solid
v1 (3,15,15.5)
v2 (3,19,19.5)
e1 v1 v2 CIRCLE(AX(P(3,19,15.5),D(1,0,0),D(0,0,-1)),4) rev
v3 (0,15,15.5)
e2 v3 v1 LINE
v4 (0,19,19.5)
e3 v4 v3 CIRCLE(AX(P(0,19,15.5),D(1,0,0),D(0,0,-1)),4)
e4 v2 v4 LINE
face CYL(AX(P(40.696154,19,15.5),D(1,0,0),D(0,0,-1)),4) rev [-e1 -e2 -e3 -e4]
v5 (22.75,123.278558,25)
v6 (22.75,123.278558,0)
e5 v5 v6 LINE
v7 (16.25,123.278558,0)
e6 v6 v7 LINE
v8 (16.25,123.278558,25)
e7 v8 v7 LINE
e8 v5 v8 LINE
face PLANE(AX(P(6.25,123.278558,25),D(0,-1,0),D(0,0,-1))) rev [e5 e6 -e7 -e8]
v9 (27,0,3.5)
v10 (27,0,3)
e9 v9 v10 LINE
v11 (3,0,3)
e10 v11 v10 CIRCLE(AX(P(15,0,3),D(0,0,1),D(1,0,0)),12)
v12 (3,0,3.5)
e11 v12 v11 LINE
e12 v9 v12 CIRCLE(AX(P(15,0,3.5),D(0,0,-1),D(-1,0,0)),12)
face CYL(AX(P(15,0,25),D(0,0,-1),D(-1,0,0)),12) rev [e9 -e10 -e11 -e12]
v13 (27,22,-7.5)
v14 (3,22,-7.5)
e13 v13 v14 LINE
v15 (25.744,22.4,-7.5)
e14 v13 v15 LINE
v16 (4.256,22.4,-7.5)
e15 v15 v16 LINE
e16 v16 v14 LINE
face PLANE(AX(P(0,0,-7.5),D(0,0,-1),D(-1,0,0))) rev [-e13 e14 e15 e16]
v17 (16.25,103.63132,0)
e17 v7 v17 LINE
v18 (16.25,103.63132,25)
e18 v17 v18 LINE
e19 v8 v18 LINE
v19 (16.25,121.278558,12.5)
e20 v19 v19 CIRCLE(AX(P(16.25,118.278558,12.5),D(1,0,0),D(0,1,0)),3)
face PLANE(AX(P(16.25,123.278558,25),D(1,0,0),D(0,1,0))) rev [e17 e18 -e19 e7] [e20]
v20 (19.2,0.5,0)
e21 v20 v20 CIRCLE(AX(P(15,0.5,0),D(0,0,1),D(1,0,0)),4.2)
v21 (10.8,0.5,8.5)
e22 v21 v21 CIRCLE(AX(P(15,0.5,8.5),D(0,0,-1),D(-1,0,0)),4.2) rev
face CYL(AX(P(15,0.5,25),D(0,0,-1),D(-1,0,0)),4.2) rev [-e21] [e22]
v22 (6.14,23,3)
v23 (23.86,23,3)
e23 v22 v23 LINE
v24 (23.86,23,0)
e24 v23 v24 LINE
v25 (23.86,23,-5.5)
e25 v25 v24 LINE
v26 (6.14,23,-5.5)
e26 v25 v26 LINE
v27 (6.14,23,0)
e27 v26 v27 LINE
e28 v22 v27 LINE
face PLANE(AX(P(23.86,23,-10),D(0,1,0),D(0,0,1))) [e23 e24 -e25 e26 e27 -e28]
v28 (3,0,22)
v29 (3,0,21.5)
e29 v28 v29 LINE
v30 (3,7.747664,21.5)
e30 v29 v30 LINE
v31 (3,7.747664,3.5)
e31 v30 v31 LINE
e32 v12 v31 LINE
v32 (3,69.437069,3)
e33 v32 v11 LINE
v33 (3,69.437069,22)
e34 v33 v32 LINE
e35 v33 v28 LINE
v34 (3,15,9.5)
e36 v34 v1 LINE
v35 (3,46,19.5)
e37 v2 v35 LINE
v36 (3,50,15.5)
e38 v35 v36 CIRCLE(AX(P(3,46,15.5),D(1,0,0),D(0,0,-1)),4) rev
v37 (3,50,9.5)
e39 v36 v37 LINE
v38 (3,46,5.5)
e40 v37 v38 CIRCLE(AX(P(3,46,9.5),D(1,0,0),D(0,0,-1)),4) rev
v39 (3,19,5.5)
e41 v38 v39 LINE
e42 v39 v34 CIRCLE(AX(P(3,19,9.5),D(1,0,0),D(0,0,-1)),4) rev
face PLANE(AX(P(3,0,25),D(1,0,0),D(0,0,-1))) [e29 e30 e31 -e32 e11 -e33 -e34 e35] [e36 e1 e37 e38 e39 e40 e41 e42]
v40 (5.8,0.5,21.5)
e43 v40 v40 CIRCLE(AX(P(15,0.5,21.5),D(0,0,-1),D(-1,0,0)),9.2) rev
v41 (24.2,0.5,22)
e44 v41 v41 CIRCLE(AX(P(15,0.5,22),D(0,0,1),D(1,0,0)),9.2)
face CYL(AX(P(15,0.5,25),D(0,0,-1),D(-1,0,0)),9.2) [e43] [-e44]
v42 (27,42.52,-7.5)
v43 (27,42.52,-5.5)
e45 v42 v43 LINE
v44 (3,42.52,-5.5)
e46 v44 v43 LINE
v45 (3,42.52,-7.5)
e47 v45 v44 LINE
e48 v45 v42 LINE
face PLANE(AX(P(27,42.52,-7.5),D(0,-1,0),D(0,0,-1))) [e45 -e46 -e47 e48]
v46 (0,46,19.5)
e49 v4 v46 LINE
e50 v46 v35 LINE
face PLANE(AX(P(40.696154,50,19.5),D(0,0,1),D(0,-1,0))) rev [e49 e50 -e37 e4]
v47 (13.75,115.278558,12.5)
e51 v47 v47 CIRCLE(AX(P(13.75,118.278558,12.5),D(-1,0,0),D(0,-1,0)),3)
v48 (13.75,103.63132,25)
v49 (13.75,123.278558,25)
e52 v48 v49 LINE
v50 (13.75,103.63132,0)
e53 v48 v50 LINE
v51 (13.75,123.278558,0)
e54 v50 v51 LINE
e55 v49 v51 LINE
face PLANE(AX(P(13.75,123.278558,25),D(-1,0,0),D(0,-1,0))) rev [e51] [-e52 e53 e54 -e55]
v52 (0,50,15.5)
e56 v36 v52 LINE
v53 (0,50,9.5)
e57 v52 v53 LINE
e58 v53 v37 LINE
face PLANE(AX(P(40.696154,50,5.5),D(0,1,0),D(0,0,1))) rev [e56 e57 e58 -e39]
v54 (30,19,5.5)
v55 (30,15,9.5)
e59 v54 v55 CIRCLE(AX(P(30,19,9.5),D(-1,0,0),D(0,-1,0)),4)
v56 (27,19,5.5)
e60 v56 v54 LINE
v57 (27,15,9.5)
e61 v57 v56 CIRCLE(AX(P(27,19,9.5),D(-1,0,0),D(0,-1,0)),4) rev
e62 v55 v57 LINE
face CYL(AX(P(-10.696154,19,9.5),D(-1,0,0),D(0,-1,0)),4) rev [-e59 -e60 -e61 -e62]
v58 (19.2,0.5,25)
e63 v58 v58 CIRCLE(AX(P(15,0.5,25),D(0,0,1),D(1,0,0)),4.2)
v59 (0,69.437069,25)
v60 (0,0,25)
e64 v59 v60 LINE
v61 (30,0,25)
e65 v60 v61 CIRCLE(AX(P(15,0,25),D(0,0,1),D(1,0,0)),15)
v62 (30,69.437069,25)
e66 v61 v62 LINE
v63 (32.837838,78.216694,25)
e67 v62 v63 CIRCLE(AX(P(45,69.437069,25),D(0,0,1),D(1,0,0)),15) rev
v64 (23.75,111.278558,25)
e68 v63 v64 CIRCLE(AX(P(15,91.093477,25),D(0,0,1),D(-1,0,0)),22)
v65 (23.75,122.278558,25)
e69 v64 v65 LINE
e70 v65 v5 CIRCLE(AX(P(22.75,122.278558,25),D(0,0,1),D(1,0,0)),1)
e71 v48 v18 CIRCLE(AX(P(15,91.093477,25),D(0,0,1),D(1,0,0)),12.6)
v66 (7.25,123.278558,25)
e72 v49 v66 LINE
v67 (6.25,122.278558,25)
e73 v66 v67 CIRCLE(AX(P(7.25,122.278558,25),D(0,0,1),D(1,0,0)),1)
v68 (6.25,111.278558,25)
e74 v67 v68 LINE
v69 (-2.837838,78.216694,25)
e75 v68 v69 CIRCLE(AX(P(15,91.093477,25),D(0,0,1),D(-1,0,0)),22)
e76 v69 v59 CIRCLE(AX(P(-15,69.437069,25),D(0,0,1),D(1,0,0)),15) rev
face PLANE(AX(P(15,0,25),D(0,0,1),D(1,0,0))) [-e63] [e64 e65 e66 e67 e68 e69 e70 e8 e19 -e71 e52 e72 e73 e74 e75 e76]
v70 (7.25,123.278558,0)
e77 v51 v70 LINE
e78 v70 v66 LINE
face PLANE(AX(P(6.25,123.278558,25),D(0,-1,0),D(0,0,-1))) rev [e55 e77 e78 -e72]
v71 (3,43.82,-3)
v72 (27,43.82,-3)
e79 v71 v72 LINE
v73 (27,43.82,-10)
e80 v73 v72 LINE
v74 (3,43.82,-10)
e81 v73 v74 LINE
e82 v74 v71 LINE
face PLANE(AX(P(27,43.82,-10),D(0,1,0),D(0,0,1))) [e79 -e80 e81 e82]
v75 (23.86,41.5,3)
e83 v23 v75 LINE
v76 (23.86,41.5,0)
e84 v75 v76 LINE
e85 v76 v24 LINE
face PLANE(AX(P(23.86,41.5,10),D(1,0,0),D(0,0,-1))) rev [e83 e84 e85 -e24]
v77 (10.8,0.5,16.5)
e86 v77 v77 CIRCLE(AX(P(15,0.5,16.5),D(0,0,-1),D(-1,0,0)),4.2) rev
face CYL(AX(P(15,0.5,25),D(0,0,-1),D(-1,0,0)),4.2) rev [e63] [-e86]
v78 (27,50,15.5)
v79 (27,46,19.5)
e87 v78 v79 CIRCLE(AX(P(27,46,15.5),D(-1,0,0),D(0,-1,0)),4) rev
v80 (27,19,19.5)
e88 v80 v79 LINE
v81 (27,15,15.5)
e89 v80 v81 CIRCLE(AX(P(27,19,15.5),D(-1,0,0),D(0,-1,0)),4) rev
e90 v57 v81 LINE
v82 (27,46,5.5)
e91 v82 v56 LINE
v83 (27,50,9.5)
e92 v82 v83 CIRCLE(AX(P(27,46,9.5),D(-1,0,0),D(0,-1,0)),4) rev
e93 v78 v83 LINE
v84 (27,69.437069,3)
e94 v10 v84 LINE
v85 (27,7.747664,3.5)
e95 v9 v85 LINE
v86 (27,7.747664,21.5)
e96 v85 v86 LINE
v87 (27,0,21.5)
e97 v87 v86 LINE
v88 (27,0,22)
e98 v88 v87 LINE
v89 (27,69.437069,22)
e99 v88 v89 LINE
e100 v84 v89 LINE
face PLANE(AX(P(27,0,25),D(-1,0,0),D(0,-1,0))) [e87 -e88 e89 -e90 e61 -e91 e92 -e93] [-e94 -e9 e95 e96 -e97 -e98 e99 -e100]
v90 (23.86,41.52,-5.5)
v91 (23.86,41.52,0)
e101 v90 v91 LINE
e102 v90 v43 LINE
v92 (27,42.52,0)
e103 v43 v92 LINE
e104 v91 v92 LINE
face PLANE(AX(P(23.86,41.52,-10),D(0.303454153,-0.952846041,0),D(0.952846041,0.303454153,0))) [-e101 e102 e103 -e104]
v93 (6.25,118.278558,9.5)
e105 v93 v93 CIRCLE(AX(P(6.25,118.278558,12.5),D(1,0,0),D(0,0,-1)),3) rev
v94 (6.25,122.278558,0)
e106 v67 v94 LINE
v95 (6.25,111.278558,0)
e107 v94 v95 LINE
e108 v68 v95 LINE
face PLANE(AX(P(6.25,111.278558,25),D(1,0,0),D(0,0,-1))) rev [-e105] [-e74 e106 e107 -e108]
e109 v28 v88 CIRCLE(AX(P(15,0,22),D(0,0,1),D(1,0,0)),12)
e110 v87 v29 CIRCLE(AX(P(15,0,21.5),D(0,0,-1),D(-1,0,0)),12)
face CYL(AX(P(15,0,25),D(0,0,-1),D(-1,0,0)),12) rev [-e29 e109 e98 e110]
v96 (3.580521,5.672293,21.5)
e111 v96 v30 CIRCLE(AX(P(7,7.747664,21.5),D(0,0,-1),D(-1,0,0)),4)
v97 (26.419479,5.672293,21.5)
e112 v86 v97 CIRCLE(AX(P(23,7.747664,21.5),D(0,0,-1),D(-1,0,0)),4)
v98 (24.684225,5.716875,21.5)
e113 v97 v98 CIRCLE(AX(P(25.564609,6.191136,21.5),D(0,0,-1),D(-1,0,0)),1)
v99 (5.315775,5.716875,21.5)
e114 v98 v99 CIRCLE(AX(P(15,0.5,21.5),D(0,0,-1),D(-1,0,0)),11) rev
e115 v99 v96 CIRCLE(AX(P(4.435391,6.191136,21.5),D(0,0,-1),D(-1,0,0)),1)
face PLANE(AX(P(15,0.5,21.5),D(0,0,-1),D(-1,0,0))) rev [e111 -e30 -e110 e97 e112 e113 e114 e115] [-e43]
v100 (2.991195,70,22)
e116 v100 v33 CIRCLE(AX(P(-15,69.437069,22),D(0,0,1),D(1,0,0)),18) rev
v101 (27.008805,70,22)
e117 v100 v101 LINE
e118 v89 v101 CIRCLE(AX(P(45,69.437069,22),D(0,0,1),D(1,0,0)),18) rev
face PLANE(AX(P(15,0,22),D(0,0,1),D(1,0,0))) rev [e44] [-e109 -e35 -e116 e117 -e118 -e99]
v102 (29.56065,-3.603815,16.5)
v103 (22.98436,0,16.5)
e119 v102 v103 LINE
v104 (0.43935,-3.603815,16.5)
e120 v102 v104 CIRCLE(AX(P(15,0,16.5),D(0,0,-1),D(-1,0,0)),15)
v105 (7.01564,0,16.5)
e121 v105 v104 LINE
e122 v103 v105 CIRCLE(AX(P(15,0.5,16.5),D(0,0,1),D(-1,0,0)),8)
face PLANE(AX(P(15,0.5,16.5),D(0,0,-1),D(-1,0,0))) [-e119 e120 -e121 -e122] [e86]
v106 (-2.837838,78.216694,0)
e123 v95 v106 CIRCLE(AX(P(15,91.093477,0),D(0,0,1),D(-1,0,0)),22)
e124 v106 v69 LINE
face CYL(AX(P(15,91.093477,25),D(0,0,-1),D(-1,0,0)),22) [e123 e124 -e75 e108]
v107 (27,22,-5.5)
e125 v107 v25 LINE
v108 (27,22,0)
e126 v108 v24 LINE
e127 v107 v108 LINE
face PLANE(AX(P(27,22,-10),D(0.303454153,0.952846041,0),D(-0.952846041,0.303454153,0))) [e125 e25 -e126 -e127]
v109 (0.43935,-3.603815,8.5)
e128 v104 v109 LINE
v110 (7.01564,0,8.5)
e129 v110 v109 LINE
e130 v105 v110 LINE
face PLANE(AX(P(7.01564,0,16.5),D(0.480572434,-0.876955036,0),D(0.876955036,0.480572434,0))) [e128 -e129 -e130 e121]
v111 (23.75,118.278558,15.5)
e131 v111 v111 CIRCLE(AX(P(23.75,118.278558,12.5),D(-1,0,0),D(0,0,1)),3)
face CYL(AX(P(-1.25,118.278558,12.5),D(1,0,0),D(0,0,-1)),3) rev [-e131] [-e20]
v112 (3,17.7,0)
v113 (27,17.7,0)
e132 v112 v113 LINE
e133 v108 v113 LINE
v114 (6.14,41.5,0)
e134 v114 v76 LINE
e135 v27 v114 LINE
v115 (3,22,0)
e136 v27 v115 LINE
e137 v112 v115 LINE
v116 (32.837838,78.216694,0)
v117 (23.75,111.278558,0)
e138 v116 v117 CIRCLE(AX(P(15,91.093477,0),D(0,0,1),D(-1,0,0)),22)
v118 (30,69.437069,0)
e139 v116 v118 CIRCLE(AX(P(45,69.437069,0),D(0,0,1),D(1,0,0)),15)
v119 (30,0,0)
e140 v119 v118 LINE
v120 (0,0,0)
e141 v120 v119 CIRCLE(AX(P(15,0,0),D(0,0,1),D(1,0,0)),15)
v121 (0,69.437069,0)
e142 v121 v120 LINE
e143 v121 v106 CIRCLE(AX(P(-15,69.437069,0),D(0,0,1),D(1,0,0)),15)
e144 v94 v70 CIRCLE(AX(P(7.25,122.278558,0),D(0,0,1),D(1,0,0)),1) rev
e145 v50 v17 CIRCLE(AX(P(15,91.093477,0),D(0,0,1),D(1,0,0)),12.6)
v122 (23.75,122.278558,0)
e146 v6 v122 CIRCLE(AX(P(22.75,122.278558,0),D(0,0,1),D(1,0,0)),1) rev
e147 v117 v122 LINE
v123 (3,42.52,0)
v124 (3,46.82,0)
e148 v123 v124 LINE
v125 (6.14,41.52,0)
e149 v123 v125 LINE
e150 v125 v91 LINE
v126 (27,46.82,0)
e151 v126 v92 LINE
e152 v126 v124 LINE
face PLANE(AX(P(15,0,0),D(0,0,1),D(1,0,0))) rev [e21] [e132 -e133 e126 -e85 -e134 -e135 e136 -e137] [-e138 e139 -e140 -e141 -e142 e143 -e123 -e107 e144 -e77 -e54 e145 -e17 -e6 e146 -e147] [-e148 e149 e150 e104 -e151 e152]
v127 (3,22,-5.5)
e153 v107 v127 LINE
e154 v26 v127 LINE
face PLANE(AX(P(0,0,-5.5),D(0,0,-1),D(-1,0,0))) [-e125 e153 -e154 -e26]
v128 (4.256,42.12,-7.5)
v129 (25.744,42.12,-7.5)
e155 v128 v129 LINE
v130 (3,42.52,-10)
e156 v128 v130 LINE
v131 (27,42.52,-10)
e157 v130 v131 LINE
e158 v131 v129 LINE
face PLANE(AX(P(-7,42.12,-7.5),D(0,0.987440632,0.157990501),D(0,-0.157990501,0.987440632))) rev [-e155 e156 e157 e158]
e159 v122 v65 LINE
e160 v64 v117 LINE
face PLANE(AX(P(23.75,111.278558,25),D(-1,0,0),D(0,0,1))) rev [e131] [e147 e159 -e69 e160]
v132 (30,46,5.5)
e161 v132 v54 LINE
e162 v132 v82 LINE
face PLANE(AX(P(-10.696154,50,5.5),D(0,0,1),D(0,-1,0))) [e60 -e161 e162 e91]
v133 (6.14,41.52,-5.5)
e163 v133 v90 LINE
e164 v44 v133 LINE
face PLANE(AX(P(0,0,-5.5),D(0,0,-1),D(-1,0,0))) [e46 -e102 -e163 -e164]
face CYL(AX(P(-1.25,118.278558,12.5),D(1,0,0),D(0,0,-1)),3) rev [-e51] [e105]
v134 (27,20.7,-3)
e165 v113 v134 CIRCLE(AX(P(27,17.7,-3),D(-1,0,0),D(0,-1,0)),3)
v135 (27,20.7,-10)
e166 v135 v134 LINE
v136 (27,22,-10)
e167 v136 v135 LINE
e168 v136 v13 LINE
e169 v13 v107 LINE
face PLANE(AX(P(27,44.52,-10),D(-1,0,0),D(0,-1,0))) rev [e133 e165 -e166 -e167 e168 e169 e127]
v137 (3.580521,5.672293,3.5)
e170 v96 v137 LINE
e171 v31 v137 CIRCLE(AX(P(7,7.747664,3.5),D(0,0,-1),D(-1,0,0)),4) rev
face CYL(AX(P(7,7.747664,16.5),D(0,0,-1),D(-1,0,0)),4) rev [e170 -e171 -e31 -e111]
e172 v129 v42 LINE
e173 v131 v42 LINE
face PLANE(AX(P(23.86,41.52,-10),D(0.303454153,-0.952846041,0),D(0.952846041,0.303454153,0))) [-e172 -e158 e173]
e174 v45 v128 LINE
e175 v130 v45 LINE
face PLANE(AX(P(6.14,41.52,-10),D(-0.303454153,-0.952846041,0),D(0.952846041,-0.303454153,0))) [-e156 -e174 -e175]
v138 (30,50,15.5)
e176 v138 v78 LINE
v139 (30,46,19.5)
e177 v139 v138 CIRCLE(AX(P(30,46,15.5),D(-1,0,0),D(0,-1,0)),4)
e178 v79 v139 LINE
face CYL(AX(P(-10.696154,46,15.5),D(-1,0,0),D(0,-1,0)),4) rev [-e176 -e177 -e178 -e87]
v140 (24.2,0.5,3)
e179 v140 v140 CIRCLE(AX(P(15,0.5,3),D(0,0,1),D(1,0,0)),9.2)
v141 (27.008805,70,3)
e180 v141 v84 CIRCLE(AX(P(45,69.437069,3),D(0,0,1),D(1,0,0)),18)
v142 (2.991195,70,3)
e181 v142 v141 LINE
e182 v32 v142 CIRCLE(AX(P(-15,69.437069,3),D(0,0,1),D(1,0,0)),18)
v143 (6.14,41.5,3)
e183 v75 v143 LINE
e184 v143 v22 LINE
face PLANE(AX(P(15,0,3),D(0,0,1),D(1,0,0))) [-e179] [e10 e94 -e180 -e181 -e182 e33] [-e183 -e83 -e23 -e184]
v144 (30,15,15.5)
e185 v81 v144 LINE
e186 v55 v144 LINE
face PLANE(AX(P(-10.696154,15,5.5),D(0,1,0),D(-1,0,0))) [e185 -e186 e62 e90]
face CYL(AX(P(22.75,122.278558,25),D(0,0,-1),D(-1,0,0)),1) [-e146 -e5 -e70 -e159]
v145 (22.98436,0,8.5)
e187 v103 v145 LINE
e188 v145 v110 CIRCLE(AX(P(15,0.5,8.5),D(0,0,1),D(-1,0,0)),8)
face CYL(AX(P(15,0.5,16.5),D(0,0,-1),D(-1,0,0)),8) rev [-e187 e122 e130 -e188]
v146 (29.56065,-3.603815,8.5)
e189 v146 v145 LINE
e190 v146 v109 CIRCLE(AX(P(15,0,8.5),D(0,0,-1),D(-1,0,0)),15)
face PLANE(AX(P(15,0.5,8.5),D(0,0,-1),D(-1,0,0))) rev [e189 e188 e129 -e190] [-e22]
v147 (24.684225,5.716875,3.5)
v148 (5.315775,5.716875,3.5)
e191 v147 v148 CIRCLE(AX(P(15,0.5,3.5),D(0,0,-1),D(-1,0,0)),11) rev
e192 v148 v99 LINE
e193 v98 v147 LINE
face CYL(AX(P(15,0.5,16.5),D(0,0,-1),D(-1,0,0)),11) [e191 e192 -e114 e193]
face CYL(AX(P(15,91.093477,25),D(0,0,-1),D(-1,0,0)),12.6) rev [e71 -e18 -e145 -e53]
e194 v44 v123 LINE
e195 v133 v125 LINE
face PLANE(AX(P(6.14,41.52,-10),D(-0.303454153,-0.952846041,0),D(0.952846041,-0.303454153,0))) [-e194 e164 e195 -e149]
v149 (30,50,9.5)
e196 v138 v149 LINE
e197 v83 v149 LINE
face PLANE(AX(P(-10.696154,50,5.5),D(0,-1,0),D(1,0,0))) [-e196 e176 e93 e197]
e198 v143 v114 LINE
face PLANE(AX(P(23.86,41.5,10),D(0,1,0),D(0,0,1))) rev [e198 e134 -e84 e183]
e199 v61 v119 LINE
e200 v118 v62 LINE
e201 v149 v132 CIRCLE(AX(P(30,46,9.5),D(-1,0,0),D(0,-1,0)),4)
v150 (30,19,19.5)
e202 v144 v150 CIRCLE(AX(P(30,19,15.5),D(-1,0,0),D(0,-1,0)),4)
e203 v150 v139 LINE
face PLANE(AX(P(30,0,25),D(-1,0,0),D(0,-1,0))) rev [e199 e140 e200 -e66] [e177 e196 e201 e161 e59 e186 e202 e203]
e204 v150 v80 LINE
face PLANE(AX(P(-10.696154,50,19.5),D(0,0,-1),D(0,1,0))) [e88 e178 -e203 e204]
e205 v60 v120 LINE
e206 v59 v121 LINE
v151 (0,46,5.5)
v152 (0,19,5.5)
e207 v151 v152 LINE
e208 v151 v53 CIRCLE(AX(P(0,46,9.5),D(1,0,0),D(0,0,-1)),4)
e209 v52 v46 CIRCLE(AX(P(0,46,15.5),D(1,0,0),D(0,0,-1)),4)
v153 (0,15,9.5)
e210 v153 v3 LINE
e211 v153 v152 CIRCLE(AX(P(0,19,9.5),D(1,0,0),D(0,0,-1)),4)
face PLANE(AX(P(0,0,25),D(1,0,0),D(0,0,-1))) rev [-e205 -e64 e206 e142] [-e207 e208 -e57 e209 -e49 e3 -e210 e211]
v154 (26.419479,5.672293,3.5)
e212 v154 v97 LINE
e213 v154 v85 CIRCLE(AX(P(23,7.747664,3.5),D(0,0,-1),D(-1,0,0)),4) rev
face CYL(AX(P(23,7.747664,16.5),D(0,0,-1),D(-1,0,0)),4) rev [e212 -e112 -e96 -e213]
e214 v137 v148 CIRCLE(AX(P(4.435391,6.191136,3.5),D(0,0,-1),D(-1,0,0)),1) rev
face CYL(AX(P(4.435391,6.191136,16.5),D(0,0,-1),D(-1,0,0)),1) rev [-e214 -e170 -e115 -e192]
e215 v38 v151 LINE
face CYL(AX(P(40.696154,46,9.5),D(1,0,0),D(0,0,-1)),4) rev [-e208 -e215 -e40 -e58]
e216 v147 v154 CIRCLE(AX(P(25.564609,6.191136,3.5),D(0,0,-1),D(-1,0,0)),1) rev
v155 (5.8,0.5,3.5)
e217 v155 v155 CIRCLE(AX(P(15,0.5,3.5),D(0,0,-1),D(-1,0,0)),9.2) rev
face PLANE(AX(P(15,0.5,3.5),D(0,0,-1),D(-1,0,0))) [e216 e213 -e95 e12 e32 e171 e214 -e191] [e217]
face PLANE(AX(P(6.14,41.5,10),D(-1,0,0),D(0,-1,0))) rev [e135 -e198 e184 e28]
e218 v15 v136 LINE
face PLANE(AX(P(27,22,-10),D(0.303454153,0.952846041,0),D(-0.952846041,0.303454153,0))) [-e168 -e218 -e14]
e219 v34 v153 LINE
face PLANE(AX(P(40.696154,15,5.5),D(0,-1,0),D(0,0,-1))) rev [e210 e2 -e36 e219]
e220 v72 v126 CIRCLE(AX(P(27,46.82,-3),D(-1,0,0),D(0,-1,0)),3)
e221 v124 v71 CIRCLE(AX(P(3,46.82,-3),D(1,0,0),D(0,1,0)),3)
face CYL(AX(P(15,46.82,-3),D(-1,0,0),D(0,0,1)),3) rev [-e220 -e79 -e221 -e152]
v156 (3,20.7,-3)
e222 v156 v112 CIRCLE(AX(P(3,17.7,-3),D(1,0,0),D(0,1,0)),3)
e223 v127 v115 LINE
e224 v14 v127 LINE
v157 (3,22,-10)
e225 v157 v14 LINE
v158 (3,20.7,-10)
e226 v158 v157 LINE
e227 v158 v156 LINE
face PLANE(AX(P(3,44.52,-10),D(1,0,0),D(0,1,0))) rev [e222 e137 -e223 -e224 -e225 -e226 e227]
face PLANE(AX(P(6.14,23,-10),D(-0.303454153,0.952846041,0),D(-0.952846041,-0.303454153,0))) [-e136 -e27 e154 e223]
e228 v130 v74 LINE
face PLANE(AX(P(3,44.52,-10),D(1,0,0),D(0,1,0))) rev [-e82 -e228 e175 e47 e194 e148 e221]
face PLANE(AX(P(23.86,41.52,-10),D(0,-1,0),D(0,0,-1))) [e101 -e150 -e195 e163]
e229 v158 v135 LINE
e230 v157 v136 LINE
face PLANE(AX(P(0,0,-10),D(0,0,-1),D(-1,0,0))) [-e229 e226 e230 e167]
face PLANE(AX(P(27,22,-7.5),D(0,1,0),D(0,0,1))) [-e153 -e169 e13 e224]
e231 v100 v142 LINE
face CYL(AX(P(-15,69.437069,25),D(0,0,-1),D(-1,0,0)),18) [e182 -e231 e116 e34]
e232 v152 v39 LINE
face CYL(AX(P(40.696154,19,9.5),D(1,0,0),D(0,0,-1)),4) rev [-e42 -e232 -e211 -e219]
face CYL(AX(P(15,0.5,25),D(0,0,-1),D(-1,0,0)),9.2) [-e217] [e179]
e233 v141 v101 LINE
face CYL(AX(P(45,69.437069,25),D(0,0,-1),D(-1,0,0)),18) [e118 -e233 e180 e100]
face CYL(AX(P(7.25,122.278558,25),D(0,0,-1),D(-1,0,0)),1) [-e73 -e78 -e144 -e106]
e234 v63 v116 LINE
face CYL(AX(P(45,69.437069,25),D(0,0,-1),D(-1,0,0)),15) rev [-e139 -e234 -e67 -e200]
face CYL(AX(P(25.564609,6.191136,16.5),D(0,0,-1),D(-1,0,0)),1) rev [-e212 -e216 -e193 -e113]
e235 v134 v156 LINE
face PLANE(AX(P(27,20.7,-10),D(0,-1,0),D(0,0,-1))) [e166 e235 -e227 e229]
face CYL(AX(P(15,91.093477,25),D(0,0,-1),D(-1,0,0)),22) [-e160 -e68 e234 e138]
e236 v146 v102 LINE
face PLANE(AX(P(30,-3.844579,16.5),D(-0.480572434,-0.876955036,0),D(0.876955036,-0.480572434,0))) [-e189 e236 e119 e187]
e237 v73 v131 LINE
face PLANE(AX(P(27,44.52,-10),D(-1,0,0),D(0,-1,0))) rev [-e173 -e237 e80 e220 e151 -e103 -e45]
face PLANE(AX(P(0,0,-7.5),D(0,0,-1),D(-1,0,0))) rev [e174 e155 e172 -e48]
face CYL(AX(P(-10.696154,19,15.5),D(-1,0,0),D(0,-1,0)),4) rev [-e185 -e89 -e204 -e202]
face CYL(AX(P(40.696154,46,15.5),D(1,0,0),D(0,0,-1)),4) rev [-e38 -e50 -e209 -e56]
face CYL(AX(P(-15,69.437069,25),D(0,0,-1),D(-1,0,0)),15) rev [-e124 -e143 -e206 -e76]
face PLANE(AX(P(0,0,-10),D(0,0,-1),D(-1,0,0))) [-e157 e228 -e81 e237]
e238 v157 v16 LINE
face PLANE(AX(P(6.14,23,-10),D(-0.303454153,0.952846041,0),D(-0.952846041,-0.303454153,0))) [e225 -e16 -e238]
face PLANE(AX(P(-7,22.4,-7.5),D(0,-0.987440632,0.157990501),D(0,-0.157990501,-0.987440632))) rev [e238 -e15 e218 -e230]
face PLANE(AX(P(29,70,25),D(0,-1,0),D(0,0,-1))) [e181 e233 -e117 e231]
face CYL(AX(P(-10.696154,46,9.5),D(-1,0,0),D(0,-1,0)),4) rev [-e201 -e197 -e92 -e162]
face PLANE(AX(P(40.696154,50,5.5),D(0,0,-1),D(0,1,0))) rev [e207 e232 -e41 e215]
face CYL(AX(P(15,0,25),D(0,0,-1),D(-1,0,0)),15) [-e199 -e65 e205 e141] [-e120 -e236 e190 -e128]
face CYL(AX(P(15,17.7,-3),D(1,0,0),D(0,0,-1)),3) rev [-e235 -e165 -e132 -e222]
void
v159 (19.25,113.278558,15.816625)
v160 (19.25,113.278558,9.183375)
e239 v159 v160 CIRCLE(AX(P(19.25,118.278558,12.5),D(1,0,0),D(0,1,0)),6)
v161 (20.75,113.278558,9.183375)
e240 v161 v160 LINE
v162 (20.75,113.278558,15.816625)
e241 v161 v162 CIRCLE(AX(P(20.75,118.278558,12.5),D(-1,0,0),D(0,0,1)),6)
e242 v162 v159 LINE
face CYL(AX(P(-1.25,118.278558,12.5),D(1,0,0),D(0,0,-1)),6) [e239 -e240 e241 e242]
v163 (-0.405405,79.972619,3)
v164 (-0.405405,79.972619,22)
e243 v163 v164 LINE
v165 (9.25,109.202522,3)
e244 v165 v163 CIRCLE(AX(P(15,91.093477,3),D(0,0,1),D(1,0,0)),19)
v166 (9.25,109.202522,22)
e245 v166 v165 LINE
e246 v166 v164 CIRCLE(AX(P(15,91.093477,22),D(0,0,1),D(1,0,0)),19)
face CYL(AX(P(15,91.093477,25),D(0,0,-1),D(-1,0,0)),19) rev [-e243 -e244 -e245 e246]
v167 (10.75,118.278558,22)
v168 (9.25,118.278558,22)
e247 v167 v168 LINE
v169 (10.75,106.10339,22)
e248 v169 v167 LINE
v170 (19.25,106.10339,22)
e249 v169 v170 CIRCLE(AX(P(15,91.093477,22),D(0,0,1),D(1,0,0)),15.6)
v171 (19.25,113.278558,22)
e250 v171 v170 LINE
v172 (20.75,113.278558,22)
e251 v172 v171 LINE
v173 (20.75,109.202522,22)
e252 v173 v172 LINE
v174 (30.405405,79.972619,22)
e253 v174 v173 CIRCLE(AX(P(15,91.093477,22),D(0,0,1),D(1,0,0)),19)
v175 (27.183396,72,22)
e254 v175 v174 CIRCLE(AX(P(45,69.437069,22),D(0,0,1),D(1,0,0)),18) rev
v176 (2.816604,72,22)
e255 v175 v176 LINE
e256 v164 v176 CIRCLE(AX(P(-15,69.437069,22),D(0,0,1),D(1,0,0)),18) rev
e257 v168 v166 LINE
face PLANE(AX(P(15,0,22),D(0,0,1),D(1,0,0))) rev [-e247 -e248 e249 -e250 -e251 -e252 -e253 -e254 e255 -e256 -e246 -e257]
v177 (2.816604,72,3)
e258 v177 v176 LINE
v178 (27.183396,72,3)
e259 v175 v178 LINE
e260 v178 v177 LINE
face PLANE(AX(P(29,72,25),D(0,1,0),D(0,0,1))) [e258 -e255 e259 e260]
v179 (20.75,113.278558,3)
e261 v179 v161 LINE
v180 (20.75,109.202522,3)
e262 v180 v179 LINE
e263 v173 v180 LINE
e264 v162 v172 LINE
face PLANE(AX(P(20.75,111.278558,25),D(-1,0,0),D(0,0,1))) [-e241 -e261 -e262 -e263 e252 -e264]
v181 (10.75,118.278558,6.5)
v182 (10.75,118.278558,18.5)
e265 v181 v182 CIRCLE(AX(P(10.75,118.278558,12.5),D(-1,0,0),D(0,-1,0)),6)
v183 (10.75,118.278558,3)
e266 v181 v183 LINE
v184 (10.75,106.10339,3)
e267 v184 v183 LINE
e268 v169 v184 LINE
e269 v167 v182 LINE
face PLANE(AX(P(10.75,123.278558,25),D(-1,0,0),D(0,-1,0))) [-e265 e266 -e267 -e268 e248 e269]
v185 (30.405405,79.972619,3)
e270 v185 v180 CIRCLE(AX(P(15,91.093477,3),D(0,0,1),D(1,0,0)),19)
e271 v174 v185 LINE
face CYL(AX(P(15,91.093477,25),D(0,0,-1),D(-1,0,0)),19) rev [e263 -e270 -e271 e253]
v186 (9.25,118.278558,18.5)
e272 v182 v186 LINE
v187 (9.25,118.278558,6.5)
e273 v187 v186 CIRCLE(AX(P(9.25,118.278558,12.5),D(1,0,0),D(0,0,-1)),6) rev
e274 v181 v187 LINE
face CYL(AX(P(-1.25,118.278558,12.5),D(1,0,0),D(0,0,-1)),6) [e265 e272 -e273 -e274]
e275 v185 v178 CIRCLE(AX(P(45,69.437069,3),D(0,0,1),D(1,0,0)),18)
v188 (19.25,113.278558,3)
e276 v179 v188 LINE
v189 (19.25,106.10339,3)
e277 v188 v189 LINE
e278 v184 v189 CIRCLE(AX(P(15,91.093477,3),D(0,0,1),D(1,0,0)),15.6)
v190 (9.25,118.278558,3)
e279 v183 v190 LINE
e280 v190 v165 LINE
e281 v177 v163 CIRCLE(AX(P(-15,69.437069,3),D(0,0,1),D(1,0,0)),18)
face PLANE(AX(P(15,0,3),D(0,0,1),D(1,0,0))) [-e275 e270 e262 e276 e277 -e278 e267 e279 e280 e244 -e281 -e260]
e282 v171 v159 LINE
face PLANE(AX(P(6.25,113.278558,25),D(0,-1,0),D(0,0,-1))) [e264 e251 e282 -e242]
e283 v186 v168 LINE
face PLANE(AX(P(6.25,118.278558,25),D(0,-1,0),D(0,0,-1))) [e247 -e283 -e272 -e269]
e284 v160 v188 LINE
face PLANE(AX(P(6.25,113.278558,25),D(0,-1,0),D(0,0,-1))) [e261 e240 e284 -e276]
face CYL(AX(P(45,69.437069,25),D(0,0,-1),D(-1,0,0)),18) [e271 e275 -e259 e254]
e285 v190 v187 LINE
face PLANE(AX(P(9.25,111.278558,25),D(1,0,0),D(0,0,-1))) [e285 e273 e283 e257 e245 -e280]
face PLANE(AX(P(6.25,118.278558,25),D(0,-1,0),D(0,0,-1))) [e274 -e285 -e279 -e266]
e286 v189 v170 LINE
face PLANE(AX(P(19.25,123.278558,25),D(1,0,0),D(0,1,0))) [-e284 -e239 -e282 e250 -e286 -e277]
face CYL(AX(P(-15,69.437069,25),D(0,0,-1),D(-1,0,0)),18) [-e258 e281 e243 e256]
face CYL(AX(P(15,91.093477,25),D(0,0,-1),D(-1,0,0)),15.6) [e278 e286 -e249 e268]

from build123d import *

# Parameters (mm, degrees)
BOSS_EXTRUDE1_DEPTH      = 25
CUT_EXTRUDE4_START       = 8.5
CUT_EXTRUDE4_DEPTH       = 8
SKETCH10_R               = 4.2
CUT_EXTRUDE6_DEPTH       = 122.590026426
SKETCH11_W               = 24
SKETCH11_H               = 24.52
BOSS_EXTRUDE2_DEPTH      = 10
CUT_EXTRUDE7_DEPTH       = 122.590026426
CUT_EXTRUDE8_START       = 5.5
SKETCH14_W               = 24
SKETCH14_H               = 20.52
CUT_EXTRUDE8_DEPTH       = 2
SKETCH22_R               = 12.6
CUT_EXTRUDE16_DEPTH      = 122.590026426
SKETCH24_W               = 17.5
SKETCH24_H               = 12
BOSS_EXTRUDE3_DEPTH      = 25
FILLET6_R                = 15
FILLET7_R                = 1
SKETCH25_R               = 3
CUT_EXTRUDE18_DEPTH      = 25
SKETCH26_W               = 2.5
SKETCH26_H               = 20
CUT_EXTRUDE19_DEPTH      = 25
SHELL14_START            = 9.25
SHELL14_DEPTH            = 1.5
SHELL14_START_2          = 3
SHELL14_2_DEPTH          = 19
SHELL14_3_OUTLINE_R      = 9.2
SHELL14_3_DEPTH          = 0.5
SHELL14_START_3          = 21.5
SHELL14_4_OUTLINE_R      = 9.2
SHELL14_4_DEPTH          = 0.5
SHELL14_START_4          = 8
SHELL14_5_DEPTH          = 2.75
SHELL14_START_5          = 19.25
SHELL14_6_DEPTH          = 1.5
SKETCH27_W               = 17.72
SKETCH27_H               = 18.5
CUT_EXTRUDE20_DEPTH      = 10
SKETCH28_W               = 14
SKETCH28_H               = 35
CUT_EXTRUDE21_DEPTH      = 3
SKETCH29_W               = 14
SKETCH29_H               = 35
CUT_EXTRUDE22_DEPTH      = 3
FILLET8_R                = 4
FILLET9_R                = 4
FILLET10_R               = 1
CUT_EXTRUDE23_DEPTH      = 132.116752851
CUT_EXTRUDE23_DEPTH_BACK = 132.116752851
SKETCH32_W               = 24
SKETCH32_H               = 0.7
CUT_EXTRUDE24_DEPTH      = 132.116752851
FILLET11_R               = 3
BOSS_EXTRUDE4_REACH      = 133.117
SKETCH33_W               = 28
SKETCH33_H               = 2


with BuildPart() as part:
    # Sketch1 → Boss-Extrude1 (new body)
    with BuildSketch(Plane.XY):
        with BuildLine():
            Line((30, 0), (30, 75))
            ThreePointArc((30, 75), (15, 113.093476939), (0, 75))
            Line((0, 75), (0, 0))
            ThreePointArc((0, 0), (15, -15), (30, 0))
        make_face()
    extrude(amount=BOSS_EXTRUDE1_DEPTH)

    # Sketch9 → Cut-Extrude4 (cut)
    with BuildSketch(Plane.XY.offset(CUT_EXTRUDE4_START)):
        with BuildLine():
            Line((7.015640289, 0), (0, -3.844579475))
            Line((0, -3.844579475), (0, -19.136394538))
            Line((0, -19.136394538), (30, -19.136394538))
            Line((30, -19.136394538), (30, -3.844579475))
            Line((30, -3.844579475), (22.984359711, 0))
            ThreePointArc((22.984359711, 0), (15, 8.5), (7.015640289, 0))
        make_face()
    extrude(amount=CUT_EXTRUDE4_DEPTH, mode=Mode.SUBTRACT)

    # Sketch10 → Cut-Extrude6 (cut, through all)
    with BuildSketch(Plane.XY):
        with Locations(Location((15, 0.5, 0), (0, 0, 180))):
            Circle(SKETCH10_R)
    extrude(amount=CUT_EXTRUDE6_DEPTH, mode=Mode.SUBTRACT)

    # Sketch11 → Boss-Extrude2 (add)
    with BuildSketch(Plane(origin=(0, 0, 0), x_dir=(-1, 0, 0), z_dir=(0, 0, -1))):
        with Locations((-15, 32.26)):
            Rectangle(SKETCH11_W, SKETCH11_H)
    extrude(amount=BOSS_EXTRUDE2_DEPTH)

    # Sketch12 → Cut-Extrude7 (cut, through all)
    with BuildSketch(Plane(origin=(0, 0, 0), x_dir=(-1, 0, 0), z_dir=(0, 0, -1))):
        Polygon((-3, 42.52), (-3, 22), (-6.14, 23), (-23.86, 23), (-27, 22), (-27, 42.52), (-23.86, 41.52), (-6.14, 41.52), align=None)
    extrude(amount=CUT_EXTRUDE7_DEPTH, mode=Mode.SUBTRACT)

    # Sketch14 → Cut-Extrude8 (cut)
    with BuildSketch(Plane(origin=(0, 0, 0), x_dir=(-1, 0, 0), z_dir=(0, 0, -1)).offset(CUT_EXTRUDE8_START)):
        with Locations((-15, 32.26)):
            Rectangle(SKETCH14_W, SKETCH14_H)
    extrude(amount=CUT_EXTRUDE8_DEPTH, mode=Mode.SUBTRACT)

    # Sketch22 → Cut-Extrude16 (cut, through all)
    with BuildSketch(Plane.XY):
        with Locations((15, 91.093476939)):
            Circle(SKETCH22_R)
    extrude(amount=CUT_EXTRUDE16_DEPTH, mode=Mode.SUBTRACT)

    # Sketch24 → Boss-Extrude3 (add)
    with BuildSketch(Plane.XY):
        with Locations((15, 117.278558064)):
            Rectangle(SKETCH24_W, SKETCH24_H)
    extrude(amount=BOSS_EXTRUDE3_DEPTH)

    # Fillet6
    fillet6_edges = [part.edges().sort_by_distance(p)[0] for p in [
        (0, 75, 12.5),
        (30, 75, 12.5),
    ]]
    fillet(fillet6_edges, radius=FILLET6_R)

    # Fillet7
    fillet7_edges = [part.edges().sort_by_distance(p)[0] for p in [
        (6.25, 123.278558064, 12.5),
        (23.75, 123.278558064, 12.5),
    ]]
    fillet(fillet7_edges, radius=FILLET7_R)

    # Sketch25 → Cut-Extrude18 (cut)
    with BuildSketch(Plane(origin=(23.75, 0, 23.75), x_dir=(0, 0, 1), z_dir=(-1, 0, 0))):
        with Locations(Location((-11.25, 118.278558064, 0), (0, 0, 180))):
            Circle(SKETCH25_R)
    extrude(amount=CUT_EXTRUDE18_DEPTH, mode=Mode.SUBTRACT)

    # Sketch26 → Cut-Extrude19 (cut)
    with BuildSketch(Plane(origin=(0, 0, 0), x_dir=(-1, 0, 0), z_dir=(0, 0, -1))):
        with Locations((-15, 113.278558064)):
            Rectangle(SKETCH26_W, SKETCH26_H)
    extrude(amount=-CUT_EXTRUDE19_DEPTH, mode=Mode.SUBTRACT)

    # Shell14: read off the stored shape, not the designer's step
    # Shell14 outline → Shell14 (cut)
    with BuildSketch(Plane.YZ.offset(SHELL14_START)):
        with BuildLine():
            Line((118.278558064, 22), (113.278558064, 22))
            Line((113.278558064, 22), (113.278558064, 15.81662479))
            ThreePointArc((113.278558064, 15.81662479), (115.441283733, 17.786764074), (118.278558064, 18.5))
            Line((118.278558064, 18.5), (118.278558064, 22))
        make_face()
        with BuildLine():
            ThreePointArc((118.278558064, 6.5), (115.441283733, 7.213235926), (113.278558064, 9.18337521))
            Line((113.278558064, 9.18337521), (113.278558064, 3))
            Line((113.278558064, 3), (118.278558064, 3))
            Line((118.278558064, 3), (118.278558064, 6.5))
        make_face()
    extrude(amount=SHELL14_DEPTH, mode=Mode.SUBTRACT)

    # Shell14 2 outline → Shell14 2 (cut)
    with BuildSketch(Plane.XY.offset(SHELL14_START_2)):
        with BuildLine():
            Line((20.75, 113.278558064), (19.25, 113.278558064))
            Line((19.25, 113.278558064), (19.25, 106.10339033))
            ThreePointArc((19.25, 106.10339033), (15, 75.493476939), (10.75, 106.10339033))
            Line((10.75, 106.10339033), (10.75, 113.278558064))
            Line((10.75, 113.278558064), (9.25, 113.278558064))
            Line((9.25, 113.278558064), (9.25, 109.202521641))
            ThreePointArc((9.25, 109.202521641), (-3.041191716, 97.052956906), (-0.405405405, 79.972618866))
            ThreePointArc((-0.405405405, 79.972618866), (2.127502776, 74.973191279), (3, 69.437069112))
            Line((3, 69.437069112), (3, 3.500970796))
            Line((3, 3.500970796), (4.734171365, 4.451298829))
            ThreePointArc((4.734171365, 4.451298829), (15, 11.5), (25.265828635, 4.451298829))
            Line((25.265828635, 4.451298829), (27, 3.500970796))
            Line((27, 3.500970796), (27, 69.437069112))
            ThreePointArc((27, 69.437069112), (27.872497224, 74.973191279), (30.405405405, 79.972618866))
            ThreePointArc((30.405405405, 79.972618866), (33.041191716, 97.052956906), (20.75, 109.202521641))
            Line((20.75, 109.202521641), (20.75, 113.278558064))
        make_face()
    extrude(amount=SHELL14_2_DEPTH, mode=Mode.SUBTRACT)

    # Shell14 3 outline → Shell14 3 (cut)
    with BuildSketch(Plane.XY.offset(SHELL14_START_2)):
        with BuildLine():
            Line((27, 0), (27, 3.500970796))
            Line((27, 3.500970796), (25.265828635, 4.451298829))
            ThreePointArc((25.265828635, 4.451298829), (15, 11.5), (4.734171365, 4.451298829))
            Line((4.734171365, 4.451298829), (3, 3.500970796))
            Line((3, 3.500970796), (3, 0))
            ThreePointArc((3, 0), (15, -12), (27, 0))
        make_face()
        with Locations((15, 0.5)):
            Circle(SHELL14_3_OUTLINE_R, mode=Mode.SUBTRACT)
    extrude(amount=SHELL14_3_DEPTH, mode=Mode.SUBTRACT)

    # Shell14 4 outline → Shell14 4 (cut)
    with BuildSketch(Plane.XY.offset(SHELL14_START_3)):
        with BuildLine():
            Line((27, 0), (27, 3.500970796))
            Line((27, 3.500970796), (25.265828635, 4.451298829))
            ThreePointArc((25.265828635, 4.451298829), (15, 11.5), (4.734171365, 4.451298829))
            Line((4.734171365, 4.451298829), (3, 3.500970796))
            Line((3, 3.500970796), (3, 0))
            ThreePointArc((3, 0), (15, -12), (27, 0))
        make_face()
        with Locations((15, 0.5)):
            Circle(SHELL14_4_OUTLINE_R, mode=Mode.SUBTRACT)
    extrude(amount=SHELL14_4_DEPTH, mode=Mode.SUBTRACT)

    # Shell14 5 outline → Shell14 5 (add)
    with BuildSketch(Plane.YZ.offset(SHELL14_START_4)):
        with BuildLine():
            Line((113.278558064, 9.18337521), (113.278558064, 15.81662479))
            ThreePointArc((113.278558064, 15.81662479), (112.278558064, 12.5), (113.278558064, 9.18337521))
        make_face()
    extrude(amount=SHELL14_5_DEPTH)

    # Shell14 6 outline → Shell14 6 (add)
    with BuildSketch(Plane.YZ.offset(SHELL14_START_5)):
        with BuildLine():
            Line((113.278558064, 9.18337521), (113.278558064, 15.81662479))
            ThreePointArc((113.278558064, 15.81662479), (112.278558064, 12.5), (113.278558064, 9.18337521))
        make_face()
    extrude(amount=SHELL14_6_DEPTH)

    # Sketch27 → Cut-Extrude20 (cut)
    with BuildSketch(Plane(origin=(0, 0, 0), x_dir=(-1, 0, 0), z_dir=(0, 0, -1))):
        with Locations((-15, 32.25)):
            Rectangle(SKETCH27_W, SKETCH27_H)
    extrude(amount=-CUT_EXTRUDE20_DEPTH, mode=Mode.SUBTRACT)

    # Sketch28 → Cut-Extrude21 (cut)
    with BuildSketch(Plane.ZY):
        with Locations((12.5, 32.5)):
            Rectangle(SKETCH28_W, SKETCH28_H)
    extrude(amount=-CUT_EXTRUDE21_DEPTH, mode=Mode.SUBTRACT)

    # Sketch29 → Cut-Extrude22 (cut)
    with BuildSketch(Plane(origin=(30, 0, -30), x_dir=(0, 0, 1), z_dir=(-1, 0, 0))):
        with Locations((42.5, 32.5)):
            Rectangle(SKETCH29_W, SKETCH29_H)
    extrude(amount=CUT_EXTRUDE22_DEPTH, mode=Mode.SUBTRACT)

    # Fillet8
    fillet8_edges = [part.edges().sort_by_distance(p)[0] for p in [
        (1.5, 15, 19.5),
        (1.5, 50, 19.5),
        (1.5, 50, 5.5),
        (1.5, 15, 5.5),
        (28.5, 50, 5.5),
        (28.5, 15, 5.5),
        (28.5, 15, 19.5),
        (28.5, 50, 19.5),
    ]]
    fillet(fillet8_edges, radius=FILLET8_R)

    # Fillet9
    # the kernel refuses this fillet: 4 mm, written as the material it adds along each edge
    with BuildSketch(Plane(origin=(3, 3.500970796, 3.5), x_dir=(0, 1, 0), z_dir=(0, 0, 1))) as fillet9_piece_1:
        with BuildLine():
            CenterArc((4.246692788, -4), FILLET9_R, 90, 55.496459683)
            Line((0.950328033, -1.734171365), (0.884400738, -1.688854792))
            ThreePointArc((0.884400738, -1.688854792), (0.405007614, -0.905531477), (-0.070156403, -0.038445795))
            Line((-0.070156403, -0.038445795), (0, 0.08))
            Line((0, 0.08), (4.246692788, 0.08))
            Line((4.246692788, 0.08), (4.246692788, 0))
        make_face()
    extrude(amount=18)
    with BuildSketch(Plane(origin=(27, 3.500970796, 3.5), x_dir=(0, 1, 0), z_dir=(0, 0, 1))) as fillet9_piece_2:
        with BuildLine():
            CenterArc((4.246692788, 4), FILLET9_R, 214.503540317, 55.496459683)
            Line((0.950328033, 1.734171365), (0.884400738, 1.688854792))
            ThreePointArc((0.884400738, 1.688854792), (0.405007614, 0.905531477), (-0.070156403, 0.038445795))
            Line((-0.070156403, 0.038445795), (0, -0.08))
            Line((0, -0.08), (4.246692788, -0.08))
            Line((4.246692788, -0.08), (4.246692788, 0))
        make_face()
    extrude(amount=18)

    # Fillet10
    fillet10_edges = [part.edges().sort_by_distance(p)[0] for p in [
        (25.265828635, 4.451298829, 12.5),
        (4.734171365, 4.451298829, 12.5),
    ]]
    fillet(fillet10_edges, radius=FILLET10_R)

    # Sketch30 → Cut-Extrude23 (cut, two sides: drawn at the far end of the back side and taken through both)
    with BuildSketch(Plane(origin=(0, 0, 0), x_dir=(0, 0, -1), z_dir=(1, 0, 0)).offset(-CUT_EXTRUDE23_DEPTH_BACK)):
        Polygon((10, 42.52), (10, 41.52), (7.5, 41.52), (7.5, 42.12), align=None)
        Polygon((10, 22), (10, 23), (7.5, 23), (7.5, 22.4), align=None)
    extrude(amount=CUT_EXTRUDE23_DEPTH + CUT_EXTRUDE23_DEPTH_BACK, mode=Mode.SUBTRACT)

    # Sketch32 → Cut-Extrude24 (cut, through all)
    with BuildSketch(Plane(origin=(0, 0, 0), x_dir=(-1, 0, 0), z_dir=(0, 0, -1))):
        with Locations((-15, 44.17)):
            Rectangle(SKETCH32_W, SKETCH32_H)
        with Locations((-15, 20.35)):
            Rectangle(SKETCH32_W, SKETCH32_H)
    extrude(amount=CUT_EXTRUDE24_DEPTH, mode=Mode.SUBTRACT)

    # Fillet11
    fillet11_edges = [part.edges().sort_by_distance(p)[0] for p in [
        (15, 43.82, 0),
        (15, 20.7, 0),
    ]]
    fillet(fillet11_edges, radius=FILLET11_R)

    # Sketch33 → Boss-Extrude4 (add, up to next)
    with BuildSketch(Plane(origin=(0, 0, 0), x_dir=(-1, 0, 0), z_dir=(0, 0, -1)), mode=Mode.PRIVATE) as boss_extrude4_sk1:
        with Locations((-15, 71)):
            Rectangle(SKETCH33_W, SKETCH33_H)
    boss_extrude4_tool1 = extrude(boss_extrude4_sk1.sketch, amount=-BOSS_EXTRUDE4_REACH, mode=Mode.PRIVATE) - part.part
    add(boss_extrude4_tool1.solids().sort_by_distance((15, 71, 0))[0])


solid = part.part
